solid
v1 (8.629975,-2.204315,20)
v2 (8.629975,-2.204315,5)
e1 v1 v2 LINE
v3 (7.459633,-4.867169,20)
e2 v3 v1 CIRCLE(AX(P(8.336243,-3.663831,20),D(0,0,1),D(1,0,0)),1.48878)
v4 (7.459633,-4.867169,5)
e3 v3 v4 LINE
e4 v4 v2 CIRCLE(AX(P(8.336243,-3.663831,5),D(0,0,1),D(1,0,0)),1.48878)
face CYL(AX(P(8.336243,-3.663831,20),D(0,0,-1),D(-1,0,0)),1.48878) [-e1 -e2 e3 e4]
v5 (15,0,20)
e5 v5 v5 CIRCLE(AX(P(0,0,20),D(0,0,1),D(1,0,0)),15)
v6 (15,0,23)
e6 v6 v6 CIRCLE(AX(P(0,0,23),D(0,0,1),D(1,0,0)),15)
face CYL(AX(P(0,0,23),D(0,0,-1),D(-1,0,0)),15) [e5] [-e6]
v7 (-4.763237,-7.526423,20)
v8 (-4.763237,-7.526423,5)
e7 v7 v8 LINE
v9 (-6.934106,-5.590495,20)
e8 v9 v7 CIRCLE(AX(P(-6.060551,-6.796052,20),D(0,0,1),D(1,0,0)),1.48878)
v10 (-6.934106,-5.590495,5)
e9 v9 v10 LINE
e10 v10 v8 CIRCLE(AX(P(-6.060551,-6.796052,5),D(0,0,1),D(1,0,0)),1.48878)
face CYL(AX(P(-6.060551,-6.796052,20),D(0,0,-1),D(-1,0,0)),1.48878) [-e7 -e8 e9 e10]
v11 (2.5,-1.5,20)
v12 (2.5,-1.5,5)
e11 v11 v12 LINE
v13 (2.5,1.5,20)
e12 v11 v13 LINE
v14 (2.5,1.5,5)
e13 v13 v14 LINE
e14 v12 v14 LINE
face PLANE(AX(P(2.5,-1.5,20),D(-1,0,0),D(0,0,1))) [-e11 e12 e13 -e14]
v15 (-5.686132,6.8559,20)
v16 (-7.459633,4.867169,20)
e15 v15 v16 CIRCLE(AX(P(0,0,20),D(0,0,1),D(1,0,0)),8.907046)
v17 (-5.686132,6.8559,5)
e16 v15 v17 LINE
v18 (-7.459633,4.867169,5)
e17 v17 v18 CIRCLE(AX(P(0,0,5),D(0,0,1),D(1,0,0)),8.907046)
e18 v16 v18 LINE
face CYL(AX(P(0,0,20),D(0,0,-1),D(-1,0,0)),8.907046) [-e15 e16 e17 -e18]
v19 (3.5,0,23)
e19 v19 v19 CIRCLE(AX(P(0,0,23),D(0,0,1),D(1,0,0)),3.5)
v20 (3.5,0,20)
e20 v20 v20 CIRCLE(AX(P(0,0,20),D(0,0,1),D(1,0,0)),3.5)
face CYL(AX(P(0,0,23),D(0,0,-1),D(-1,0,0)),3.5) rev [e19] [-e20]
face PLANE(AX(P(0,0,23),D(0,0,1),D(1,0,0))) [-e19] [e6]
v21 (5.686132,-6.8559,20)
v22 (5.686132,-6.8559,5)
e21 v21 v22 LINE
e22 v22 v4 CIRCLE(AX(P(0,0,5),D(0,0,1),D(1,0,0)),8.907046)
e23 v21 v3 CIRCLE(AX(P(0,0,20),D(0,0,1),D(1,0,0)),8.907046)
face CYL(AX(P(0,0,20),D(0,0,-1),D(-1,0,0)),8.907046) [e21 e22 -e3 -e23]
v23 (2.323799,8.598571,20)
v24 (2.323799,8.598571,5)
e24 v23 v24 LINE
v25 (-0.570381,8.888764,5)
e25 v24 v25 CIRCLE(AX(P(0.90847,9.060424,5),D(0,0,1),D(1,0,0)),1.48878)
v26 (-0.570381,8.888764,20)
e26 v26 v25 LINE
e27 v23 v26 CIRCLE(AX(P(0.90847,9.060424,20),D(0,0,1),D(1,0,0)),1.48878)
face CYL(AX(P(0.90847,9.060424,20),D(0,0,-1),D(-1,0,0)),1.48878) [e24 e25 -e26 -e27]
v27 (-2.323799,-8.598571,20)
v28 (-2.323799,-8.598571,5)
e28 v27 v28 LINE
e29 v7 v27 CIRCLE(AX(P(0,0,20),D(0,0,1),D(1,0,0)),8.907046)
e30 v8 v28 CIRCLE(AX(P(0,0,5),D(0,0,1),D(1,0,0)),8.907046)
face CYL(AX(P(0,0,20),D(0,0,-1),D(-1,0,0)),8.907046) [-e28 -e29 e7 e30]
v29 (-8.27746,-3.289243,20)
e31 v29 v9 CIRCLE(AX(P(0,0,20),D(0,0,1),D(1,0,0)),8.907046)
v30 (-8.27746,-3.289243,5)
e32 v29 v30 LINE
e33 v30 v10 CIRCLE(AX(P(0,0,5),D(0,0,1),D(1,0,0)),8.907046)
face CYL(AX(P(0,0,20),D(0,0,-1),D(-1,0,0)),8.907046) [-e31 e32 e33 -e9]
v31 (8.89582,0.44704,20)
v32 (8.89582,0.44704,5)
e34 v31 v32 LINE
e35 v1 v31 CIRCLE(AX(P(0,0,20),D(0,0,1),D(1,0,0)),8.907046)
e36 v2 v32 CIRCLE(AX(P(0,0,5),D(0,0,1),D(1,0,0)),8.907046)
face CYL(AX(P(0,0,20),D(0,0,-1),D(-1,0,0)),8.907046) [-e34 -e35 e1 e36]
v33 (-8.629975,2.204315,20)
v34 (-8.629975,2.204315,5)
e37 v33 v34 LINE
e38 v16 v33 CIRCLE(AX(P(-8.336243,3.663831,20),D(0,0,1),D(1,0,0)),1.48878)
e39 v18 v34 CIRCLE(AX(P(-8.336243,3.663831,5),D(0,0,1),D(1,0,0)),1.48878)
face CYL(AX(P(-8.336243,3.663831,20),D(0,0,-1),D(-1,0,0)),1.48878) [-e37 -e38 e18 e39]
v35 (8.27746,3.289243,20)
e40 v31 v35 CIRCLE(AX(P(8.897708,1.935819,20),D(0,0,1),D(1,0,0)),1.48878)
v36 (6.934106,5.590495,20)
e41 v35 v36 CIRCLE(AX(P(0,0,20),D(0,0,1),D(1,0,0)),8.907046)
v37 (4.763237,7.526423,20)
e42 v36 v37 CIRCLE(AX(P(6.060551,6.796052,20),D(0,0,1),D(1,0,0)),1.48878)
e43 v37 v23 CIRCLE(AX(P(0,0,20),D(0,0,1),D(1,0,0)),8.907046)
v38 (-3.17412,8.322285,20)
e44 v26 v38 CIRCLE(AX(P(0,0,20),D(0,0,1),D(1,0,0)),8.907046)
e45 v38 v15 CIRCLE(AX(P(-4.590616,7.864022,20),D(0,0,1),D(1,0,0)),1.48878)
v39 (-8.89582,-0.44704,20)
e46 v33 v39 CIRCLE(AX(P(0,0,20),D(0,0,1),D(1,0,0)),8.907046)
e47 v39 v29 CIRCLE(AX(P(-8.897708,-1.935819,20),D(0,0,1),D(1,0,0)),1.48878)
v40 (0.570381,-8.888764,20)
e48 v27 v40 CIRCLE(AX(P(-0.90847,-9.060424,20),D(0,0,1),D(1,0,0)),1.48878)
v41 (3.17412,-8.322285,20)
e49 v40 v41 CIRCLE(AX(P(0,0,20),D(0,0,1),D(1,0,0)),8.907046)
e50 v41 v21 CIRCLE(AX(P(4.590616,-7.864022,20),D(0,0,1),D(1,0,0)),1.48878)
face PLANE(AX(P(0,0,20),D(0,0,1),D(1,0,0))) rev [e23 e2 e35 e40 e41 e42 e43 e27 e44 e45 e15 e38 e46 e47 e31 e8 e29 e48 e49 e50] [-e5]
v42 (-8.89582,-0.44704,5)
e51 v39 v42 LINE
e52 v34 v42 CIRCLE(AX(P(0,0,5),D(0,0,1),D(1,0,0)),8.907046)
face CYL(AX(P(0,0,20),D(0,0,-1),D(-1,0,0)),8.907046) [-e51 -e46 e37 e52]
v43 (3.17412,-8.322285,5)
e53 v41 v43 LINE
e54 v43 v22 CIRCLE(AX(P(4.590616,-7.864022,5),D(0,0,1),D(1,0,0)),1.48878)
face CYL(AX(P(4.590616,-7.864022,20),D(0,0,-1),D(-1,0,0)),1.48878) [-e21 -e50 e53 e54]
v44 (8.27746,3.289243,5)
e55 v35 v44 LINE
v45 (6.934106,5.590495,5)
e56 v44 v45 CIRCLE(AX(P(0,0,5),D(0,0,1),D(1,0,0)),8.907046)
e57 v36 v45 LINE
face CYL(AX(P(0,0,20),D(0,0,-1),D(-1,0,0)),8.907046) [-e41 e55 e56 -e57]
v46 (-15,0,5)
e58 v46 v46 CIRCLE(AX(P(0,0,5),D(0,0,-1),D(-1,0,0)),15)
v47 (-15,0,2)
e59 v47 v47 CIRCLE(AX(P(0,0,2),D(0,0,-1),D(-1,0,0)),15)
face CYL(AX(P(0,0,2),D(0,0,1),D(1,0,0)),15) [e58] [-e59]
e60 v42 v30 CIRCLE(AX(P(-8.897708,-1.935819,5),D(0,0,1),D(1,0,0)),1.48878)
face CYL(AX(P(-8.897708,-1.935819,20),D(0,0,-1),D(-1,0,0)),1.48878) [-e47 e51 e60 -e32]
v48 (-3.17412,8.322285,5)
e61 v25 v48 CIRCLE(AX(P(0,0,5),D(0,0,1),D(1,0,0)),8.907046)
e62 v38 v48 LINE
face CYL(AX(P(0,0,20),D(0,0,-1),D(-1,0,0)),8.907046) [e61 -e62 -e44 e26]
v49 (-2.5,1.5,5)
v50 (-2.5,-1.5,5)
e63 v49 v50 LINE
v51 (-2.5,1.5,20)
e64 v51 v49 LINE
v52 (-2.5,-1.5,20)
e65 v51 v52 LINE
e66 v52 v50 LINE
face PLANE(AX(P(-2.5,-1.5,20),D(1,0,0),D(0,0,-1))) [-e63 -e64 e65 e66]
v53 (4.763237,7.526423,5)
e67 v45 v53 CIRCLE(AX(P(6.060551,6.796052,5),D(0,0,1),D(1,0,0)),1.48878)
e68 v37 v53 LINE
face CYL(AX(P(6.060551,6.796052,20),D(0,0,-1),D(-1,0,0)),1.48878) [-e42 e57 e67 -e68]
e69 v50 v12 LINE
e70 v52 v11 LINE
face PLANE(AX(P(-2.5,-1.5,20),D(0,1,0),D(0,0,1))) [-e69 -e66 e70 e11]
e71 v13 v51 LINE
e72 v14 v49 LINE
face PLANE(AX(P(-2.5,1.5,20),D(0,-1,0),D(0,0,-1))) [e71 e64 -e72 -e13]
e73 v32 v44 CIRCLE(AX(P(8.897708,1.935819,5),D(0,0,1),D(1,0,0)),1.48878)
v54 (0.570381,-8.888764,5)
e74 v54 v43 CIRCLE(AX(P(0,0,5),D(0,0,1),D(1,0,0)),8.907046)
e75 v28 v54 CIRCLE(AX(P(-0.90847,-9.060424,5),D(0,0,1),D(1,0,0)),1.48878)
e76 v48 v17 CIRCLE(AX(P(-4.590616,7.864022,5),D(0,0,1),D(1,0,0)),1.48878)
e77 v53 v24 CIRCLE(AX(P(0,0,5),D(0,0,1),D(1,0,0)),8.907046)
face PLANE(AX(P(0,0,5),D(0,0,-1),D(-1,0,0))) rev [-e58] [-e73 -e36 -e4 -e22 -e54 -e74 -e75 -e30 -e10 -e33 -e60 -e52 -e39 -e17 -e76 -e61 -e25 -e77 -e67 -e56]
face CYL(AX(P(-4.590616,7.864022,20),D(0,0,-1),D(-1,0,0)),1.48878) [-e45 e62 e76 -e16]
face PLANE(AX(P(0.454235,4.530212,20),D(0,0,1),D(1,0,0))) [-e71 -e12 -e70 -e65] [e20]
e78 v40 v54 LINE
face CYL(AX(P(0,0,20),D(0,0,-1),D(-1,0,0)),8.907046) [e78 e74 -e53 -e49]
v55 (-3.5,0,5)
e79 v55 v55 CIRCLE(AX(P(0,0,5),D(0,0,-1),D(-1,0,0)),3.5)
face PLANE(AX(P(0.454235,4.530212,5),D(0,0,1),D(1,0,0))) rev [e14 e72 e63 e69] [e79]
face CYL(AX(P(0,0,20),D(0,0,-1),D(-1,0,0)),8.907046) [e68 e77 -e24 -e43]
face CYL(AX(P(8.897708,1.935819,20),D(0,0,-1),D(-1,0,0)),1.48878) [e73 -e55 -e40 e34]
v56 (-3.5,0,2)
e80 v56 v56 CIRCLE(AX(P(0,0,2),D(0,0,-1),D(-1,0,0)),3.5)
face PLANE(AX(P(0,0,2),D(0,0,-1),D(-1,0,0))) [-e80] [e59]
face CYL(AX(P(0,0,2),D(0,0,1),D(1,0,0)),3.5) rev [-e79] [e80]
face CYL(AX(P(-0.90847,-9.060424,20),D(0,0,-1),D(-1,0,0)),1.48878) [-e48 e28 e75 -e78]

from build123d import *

# Parameters (mm, degrees)
SKETCH2_W           = 5
SKETCH2_H           = 3
BOSS_EXTRUDE1_DEPTH = 15
SKETCH3_R           = 15
SKETCH3_R_2         = 3.5
BOSS_EXTRUDE2_DEPTH = 3
BOSS_EXTRUDE3_START = 3
SKETCH4_R           = 15
SKETCH4_R_2         = 3.5
BOSS_EXTRUDE3_DEPTH = 3


# Read off the part's stored shape, not the designer's step: Pulley part01 GT2 6mm.STEP
with BuildPart() as part:
    # Sketch2 → Boss-Extrude1 (new body)
    with BuildSketch(Plane.XY.offset(5)):
        with BuildLine():
            ThreePointArc((6.934106351, 5.59049504), (7.051433078, 7.907185894), (4.763236954, 7.526422749))
            ThreePointArc((4.763236954, 7.526422749), (3.583838208, 8.154236284), (2.32379934, 8.598570946))
            ThreePointArc((2.32379934, 8.598570946), (1.057001937, 10.541776134), (-0.570380652, 8.888764346))
            ThreePointArc((-0.570380652, 8.888764346), (-1.893553819, 8.703442975), (-3.174120037, 8.322285003))
            ThreePointArc((-3.174120037, 8.322285003), (-5.341168017, 9.149766191), (-5.686132237, 6.855900077))
            ThreePointArc((-5.686132237, 6.855900077), (-6.647672646, 5.928230265), (-7.459633444, 4.86716905))
            ThreePointArc((-7.459633444, 4.86716905), (-9.699193326, 4.262856549), (-8.629974569, 2.204315))
            ThreePointArc((-8.629974569, 2.204315), (-8.862606466, 0.888635084), (-8.895820416, -0.447040053))
            ThreePointArc((-8.895820416, -0.447040053), (-10.352456447, -2.252319406), (-8.277459935, -3.289243485))
            ThreePointArc((-8.277459935, -3.289243485), (-7.692325842, -4.490388494), (-6.934106344, -5.590495048))
            ThreePointArc((-6.934106344, -5.590495048), (-7.05143307, -7.907185904), (-4.763236946, -7.526422754))
            ThreePointArc((-4.763236946, -7.526422754), (-3.583838199, -8.154236288), (-2.323799332, -8.598570948))
            ThreePointArc((-2.323799332, -8.598570948), (-1.057001929, -10.541776143), (0.570380658, -8.888764345))
            ThreePointArc((0.570380658, -8.888764345), (1.893553823, -8.703442974), (3.174120041, -8.322285002))
            ThreePointArc((3.174120041, -8.322285002), (5.341168023, -9.149766199), (5.686132236, -6.855900078))
            ThreePointArc((5.686132236, -6.855900078), (6.647672645, -5.928230266), (7.459633443, -4.867169052))
            ThreePointArc((7.459633443, -4.867169052), (9.699193332, -4.262856559), (8.629974567, -2.204315006))
            ThreePointArc((8.629974567, -2.204315006), (8.862606465, -0.888635092), (8.895820416, 0.447040044))
            ThreePointArc((8.895820416, 0.447040044), (10.352456454, 2.252319396), (8.277459939, 3.289243476))
            ThreePointArc((8.277459939, 3.289243476), (7.692325847, 4.490388485), (6.934106351, 5.59049504))
        make_face()
        Rectangle(SKETCH2_W, SKETCH2_H, mode=Mode.SUBTRACT)
    extrude(amount=BOSS_EXTRUDE1_DEPTH)

    # Sketch3 → Boss-Extrude2 (add)
    with BuildSketch(Plane(origin=(0, 0, 5), x_dir=(-1, 0, 0), z_dir=(0, 0, -1))):
        Circle(SKETCH3_R)
        Circle(SKETCH3_R_2, mode=Mode.SUBTRACT)
    extrude(amount=BOSS_EXTRUDE2_DEPTH)

    # Sketch4 → Boss-Extrude3 (add)
    with BuildSketch(Plane.XY.offset(20).offset(BOSS_EXTRUDE3_START)):
        with Locations(Location((0, 0, 0), (0, 0, 180))):
            Circle(SKETCH4_R)
        with Locations(Location((0, 0, 0), (0, 0, 180))):
            Circle(SKETCH4_R_2, mode=Mode.SUBTRACT)
    extrude(amount=-BOSS_EXTRUDE3_DEPTH)


solid = part.part
